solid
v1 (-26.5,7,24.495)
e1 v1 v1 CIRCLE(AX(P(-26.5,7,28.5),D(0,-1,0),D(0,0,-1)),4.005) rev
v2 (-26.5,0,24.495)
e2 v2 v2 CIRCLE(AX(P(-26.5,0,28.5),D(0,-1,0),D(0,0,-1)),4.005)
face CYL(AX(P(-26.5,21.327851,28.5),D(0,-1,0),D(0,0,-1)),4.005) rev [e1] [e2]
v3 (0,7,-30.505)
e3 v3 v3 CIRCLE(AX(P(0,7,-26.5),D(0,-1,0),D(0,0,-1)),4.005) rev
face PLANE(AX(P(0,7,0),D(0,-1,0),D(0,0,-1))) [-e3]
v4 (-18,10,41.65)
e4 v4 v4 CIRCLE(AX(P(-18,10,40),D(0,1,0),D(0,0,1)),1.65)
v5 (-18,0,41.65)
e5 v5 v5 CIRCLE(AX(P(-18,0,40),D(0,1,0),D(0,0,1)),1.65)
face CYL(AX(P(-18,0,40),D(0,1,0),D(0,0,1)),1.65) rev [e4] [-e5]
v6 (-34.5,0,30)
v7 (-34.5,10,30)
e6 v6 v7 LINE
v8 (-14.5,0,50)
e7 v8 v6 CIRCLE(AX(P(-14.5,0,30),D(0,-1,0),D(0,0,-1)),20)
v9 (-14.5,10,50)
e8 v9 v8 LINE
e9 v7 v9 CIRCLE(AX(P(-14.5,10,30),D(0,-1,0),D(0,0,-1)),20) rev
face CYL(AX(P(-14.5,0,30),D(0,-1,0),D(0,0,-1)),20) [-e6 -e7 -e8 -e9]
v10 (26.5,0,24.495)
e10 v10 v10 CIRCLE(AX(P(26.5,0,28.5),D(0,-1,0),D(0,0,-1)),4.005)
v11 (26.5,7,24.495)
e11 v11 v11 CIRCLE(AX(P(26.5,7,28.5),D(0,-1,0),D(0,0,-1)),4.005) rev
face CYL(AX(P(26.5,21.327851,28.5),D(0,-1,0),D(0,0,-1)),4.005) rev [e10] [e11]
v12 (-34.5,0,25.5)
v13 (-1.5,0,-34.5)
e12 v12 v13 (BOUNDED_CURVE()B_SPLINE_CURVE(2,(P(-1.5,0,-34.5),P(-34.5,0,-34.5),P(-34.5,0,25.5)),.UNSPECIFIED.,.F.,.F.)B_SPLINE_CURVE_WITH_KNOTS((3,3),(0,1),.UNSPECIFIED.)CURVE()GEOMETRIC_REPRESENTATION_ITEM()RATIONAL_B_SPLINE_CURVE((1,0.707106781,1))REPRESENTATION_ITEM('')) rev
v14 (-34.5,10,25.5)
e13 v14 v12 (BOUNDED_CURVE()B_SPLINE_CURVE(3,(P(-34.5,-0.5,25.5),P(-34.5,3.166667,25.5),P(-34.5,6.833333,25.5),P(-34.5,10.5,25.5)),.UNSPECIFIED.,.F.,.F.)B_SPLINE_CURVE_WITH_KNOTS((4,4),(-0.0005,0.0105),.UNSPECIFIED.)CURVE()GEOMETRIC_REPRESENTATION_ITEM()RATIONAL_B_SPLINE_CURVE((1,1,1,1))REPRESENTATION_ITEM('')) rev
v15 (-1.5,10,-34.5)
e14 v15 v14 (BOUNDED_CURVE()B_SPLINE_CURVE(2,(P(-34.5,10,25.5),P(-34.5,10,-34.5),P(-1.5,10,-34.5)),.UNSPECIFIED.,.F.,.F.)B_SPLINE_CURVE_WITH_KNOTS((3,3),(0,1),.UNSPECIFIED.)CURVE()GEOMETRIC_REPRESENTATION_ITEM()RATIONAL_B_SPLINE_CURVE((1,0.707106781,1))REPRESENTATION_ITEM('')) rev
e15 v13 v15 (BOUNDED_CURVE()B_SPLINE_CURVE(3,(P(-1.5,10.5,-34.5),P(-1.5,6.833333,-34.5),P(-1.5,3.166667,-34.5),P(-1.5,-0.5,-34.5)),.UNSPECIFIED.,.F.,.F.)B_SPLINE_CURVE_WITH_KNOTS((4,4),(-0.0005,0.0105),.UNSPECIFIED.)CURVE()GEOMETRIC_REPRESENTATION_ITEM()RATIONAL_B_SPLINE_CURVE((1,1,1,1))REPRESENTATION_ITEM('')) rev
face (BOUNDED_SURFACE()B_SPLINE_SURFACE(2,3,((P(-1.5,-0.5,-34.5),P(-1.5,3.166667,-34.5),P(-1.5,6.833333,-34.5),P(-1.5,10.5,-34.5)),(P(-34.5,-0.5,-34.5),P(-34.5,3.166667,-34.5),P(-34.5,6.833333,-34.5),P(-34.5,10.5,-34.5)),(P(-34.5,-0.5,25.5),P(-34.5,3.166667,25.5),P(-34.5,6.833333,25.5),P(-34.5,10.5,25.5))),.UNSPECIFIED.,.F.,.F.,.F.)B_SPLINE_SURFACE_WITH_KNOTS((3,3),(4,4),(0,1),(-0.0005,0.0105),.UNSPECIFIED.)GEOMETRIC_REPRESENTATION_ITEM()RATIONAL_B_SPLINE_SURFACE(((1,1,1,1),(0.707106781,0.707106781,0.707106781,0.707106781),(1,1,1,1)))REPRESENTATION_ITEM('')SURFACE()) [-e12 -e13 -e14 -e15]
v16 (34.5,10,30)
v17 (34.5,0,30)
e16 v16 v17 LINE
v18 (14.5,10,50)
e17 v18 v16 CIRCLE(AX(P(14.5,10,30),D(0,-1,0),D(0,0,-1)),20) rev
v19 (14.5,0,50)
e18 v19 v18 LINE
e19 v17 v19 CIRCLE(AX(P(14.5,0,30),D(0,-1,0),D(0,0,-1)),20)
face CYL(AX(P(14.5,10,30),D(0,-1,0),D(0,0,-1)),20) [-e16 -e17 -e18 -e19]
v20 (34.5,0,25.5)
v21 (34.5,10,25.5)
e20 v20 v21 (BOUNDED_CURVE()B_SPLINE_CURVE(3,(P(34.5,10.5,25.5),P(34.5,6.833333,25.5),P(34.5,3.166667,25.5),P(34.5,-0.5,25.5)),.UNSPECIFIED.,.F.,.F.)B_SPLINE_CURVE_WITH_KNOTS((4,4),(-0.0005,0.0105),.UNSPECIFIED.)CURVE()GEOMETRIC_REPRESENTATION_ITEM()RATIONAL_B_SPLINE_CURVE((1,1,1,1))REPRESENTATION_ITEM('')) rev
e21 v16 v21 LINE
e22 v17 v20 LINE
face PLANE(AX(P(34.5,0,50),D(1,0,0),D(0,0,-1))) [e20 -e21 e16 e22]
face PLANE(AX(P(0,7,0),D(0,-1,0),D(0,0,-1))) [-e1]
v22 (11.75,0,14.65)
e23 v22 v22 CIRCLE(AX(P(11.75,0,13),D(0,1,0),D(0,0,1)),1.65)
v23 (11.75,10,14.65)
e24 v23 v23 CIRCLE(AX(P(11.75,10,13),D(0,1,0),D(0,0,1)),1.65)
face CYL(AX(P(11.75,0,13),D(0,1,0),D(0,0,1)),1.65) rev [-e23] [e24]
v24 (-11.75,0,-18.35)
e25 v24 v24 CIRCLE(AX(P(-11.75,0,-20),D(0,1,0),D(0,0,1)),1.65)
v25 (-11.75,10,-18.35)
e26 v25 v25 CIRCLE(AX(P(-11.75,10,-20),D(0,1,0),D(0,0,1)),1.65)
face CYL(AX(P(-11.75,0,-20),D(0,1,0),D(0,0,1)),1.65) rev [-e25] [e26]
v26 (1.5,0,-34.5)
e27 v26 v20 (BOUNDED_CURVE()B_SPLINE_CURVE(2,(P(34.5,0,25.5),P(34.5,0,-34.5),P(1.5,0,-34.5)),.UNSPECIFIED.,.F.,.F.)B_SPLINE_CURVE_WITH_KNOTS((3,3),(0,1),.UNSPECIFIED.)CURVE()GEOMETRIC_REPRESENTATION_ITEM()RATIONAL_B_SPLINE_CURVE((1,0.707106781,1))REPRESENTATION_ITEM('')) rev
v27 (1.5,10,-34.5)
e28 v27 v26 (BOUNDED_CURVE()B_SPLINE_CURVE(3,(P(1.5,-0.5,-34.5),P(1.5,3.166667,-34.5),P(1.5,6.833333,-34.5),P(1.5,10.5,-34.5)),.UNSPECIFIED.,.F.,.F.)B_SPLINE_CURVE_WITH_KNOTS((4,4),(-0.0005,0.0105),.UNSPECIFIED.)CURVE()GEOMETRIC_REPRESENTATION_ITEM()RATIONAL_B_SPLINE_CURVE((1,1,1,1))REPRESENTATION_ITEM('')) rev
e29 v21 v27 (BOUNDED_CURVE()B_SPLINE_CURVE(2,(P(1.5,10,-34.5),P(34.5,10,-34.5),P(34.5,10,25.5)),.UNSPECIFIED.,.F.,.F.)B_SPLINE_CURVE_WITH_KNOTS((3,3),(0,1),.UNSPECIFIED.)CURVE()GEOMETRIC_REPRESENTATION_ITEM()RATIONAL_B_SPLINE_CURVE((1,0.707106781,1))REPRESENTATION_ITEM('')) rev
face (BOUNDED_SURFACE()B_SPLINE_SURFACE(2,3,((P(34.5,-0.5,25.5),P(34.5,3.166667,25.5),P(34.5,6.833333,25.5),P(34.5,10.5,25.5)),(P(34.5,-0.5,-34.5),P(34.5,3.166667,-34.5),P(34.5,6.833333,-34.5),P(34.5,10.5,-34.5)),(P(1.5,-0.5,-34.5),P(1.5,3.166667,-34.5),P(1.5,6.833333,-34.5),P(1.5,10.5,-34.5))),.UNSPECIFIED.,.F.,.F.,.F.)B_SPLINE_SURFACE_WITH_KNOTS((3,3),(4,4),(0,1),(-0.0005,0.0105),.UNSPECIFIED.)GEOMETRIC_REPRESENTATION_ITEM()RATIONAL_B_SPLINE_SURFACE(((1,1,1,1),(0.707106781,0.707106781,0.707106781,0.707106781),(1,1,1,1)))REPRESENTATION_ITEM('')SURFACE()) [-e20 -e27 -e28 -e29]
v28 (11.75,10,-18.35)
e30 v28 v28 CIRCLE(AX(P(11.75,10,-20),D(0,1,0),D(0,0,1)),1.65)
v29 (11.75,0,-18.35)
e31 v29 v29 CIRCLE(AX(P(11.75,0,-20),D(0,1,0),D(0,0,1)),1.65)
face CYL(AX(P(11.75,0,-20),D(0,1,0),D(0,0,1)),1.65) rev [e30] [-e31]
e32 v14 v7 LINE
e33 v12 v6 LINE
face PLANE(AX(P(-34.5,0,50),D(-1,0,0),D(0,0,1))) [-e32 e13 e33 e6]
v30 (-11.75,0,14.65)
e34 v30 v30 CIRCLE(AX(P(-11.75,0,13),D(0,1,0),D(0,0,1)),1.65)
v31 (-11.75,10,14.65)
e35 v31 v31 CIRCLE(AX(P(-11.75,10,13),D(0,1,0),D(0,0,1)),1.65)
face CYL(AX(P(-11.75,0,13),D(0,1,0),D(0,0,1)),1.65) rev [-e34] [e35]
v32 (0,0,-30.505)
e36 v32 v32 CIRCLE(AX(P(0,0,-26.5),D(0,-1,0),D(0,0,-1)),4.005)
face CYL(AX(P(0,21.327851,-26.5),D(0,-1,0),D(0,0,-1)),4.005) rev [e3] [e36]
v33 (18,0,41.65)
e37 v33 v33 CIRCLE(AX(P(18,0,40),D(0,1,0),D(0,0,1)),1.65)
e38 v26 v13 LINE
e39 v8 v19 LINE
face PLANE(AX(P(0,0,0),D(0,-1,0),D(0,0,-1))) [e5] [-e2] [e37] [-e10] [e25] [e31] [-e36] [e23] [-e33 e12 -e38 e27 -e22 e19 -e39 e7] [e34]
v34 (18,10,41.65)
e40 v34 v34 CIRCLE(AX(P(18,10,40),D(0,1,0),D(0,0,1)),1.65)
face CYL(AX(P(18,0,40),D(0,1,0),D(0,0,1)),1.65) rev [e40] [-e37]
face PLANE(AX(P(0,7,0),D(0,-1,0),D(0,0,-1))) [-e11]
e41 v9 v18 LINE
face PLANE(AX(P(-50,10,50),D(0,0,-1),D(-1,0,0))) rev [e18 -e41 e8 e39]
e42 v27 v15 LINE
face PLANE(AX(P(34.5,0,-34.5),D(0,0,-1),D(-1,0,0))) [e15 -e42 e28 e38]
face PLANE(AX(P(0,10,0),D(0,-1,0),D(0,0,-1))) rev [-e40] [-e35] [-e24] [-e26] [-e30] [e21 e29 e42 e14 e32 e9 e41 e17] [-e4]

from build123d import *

# Parameters (mm, degrees)
SKETCH1_W           = 100
SKETCH1_H           = 100
BOSS_EXTRUDE1_DEPTH = 10
SKETCH2_R           = 4.005
CUT_EXTRUDE1_DEPTH  = 7
SKETCH3_R           = 1.65
CUT_EXTRUDE2_DEPTH  = 72.414284285
SKETCH4_OUTSIDE_W   = 130.354
SKETCH4_OUTSIDE_H   = 130.354
SKETCH4_OUTSIDE_W_2 = 69
SKETCH4_OUTSIDE_H_2 = 84.5
CUT_EXTRUDE3_DEPTH  = 72.414284285
FILLET1_R           = 20
FILLET2_SIZE        = 33
FILLET2_SIZE_2      = 60


with BuildPart() as part:
    # Sketch1 → Boss-Extrude1 (new body)
    with BuildSketch(Plane(origin=(0, 0, 0), x_dir=(1, 0, 0), z_dir=(0, 1, 0))):
        Rectangle(SKETCH1_W, SKETCH1_H)
    extrude(amount=BOSS_EXTRUDE1_DEPTH)

    # Sketch2 → Cut-Extrude1 (cut)
    with BuildSketch(Plane.XZ):
        with Locations(Location((-26.5, 28.5, 0), (0, 0, 270))):
            Circle(SKETCH2_R)
        with Locations(Location((26.5, 28.5, 0), (0, 0, 270))):
            Circle(SKETCH2_R)
        with Locations(Location((0, -26.5, 0), (0, 0, 270))):
            Circle(SKETCH2_R)
    extrude(amount=-CUT_EXTRUDE1_DEPTH, mode=Mode.SUBTRACT)

    # Sketch3 → Cut-Extrude2 (cut, through all)
    with BuildSketch(Plane(origin=(0, 10, 0), x_dir=(1, 0, 0), z_dir=(0, 1, 0))):
        with Locations(Location((-11.75, 20, 0), (0, 0, 270))):
            Circle(SKETCH3_R)
        with Locations(Location((11.75, 20, 0), (0, 0, 270))):
            Circle(SKETCH3_R)
        with Locations(Location((11.75, -13, 0), (0, 0, 270))):
            Circle(SKETCH3_R)
        with Locations(Location((18, -40, 0), (0, 0, 270))):
            Circle(SKETCH3_R)
        with Locations(Location((-18, -40, 0), (0, 0, 270))):
            Circle(SKETCH3_R)
        with Locations(Location((-11.75, -13, 0), (0, 0, 270))):
            Circle(SKETCH3_R)
    extrude(amount=-CUT_EXTRUDE2_DEPTH, mode=Mode.SUBTRACT)

    # Sketch4 outside → Cut-Extrude3 (cut, through all)
    with BuildSketch(Plane(origin=(0, 10, 0), x_dir=(1, 0, 0), z_dir=(0, 1, 0))):
        Rectangle(SKETCH4_OUTSIDE_W, SKETCH4_OUTSIDE_H)
        with Locations((0, -7.75)):
            Rectangle(SKETCH4_OUTSIDE_W_2, SKETCH4_OUTSIDE_H_2, mode=Mode.SUBTRACT)
    extrude(amount=-CUT_EXTRUDE3_DEPTH, mode=Mode.SUBTRACT)

    # Fillet1
    fillet1_edges = [part.edges().sort_by_distance(p)[0] for p in [
        (-34.5, 5, 50),
        (34.5, 5, 50),
    ]]
    fillet(fillet1_edges, radius=FILLET1_R)

    # Fillet2
    # an asymmetric fillet: 60, 33 mm, written as the material it takes off along each edge
    with BuildSketch(Plane(origin=(34.5, 160, -34.5), x_dir=(-1, 0, 0), z_dir=(0, -1, 0))) as fillet2_piece_1:
        with BuildLine():
            Bezier((FILLET2_SIZE, 0), (0, 0), (0, -FILLET2_SIZE_2), weights=[1, 0.707106781, 1])
            Line((0, -FILLET2_SIZE_2), (0, 0))
            Line((0, 0), (FILLET2_SIZE, 0))
        make_face()
    extrude(amount=310, mode=Mode.SUBTRACT)
    with BuildSketch(Plane(origin=(-34.5, 160, -34.5), x_dir=(0, 0, 1), z_dir=(0, -1, 0))) as fillet2_piece_2:
        with BuildLine():
            Bezier((FILLET2_SIZE_2, 0), (0, 0), (0, -FILLET2_SIZE), weights=[1, 0.707106781, 1])
            Line((0, -FILLET2_SIZE), (0, 0))
            Line((0, 0), (FILLET2_SIZE_2, 0))
        make_face()
    extrude(amount=310, mode=Mode.SUBTRACT)


solid = part.part
